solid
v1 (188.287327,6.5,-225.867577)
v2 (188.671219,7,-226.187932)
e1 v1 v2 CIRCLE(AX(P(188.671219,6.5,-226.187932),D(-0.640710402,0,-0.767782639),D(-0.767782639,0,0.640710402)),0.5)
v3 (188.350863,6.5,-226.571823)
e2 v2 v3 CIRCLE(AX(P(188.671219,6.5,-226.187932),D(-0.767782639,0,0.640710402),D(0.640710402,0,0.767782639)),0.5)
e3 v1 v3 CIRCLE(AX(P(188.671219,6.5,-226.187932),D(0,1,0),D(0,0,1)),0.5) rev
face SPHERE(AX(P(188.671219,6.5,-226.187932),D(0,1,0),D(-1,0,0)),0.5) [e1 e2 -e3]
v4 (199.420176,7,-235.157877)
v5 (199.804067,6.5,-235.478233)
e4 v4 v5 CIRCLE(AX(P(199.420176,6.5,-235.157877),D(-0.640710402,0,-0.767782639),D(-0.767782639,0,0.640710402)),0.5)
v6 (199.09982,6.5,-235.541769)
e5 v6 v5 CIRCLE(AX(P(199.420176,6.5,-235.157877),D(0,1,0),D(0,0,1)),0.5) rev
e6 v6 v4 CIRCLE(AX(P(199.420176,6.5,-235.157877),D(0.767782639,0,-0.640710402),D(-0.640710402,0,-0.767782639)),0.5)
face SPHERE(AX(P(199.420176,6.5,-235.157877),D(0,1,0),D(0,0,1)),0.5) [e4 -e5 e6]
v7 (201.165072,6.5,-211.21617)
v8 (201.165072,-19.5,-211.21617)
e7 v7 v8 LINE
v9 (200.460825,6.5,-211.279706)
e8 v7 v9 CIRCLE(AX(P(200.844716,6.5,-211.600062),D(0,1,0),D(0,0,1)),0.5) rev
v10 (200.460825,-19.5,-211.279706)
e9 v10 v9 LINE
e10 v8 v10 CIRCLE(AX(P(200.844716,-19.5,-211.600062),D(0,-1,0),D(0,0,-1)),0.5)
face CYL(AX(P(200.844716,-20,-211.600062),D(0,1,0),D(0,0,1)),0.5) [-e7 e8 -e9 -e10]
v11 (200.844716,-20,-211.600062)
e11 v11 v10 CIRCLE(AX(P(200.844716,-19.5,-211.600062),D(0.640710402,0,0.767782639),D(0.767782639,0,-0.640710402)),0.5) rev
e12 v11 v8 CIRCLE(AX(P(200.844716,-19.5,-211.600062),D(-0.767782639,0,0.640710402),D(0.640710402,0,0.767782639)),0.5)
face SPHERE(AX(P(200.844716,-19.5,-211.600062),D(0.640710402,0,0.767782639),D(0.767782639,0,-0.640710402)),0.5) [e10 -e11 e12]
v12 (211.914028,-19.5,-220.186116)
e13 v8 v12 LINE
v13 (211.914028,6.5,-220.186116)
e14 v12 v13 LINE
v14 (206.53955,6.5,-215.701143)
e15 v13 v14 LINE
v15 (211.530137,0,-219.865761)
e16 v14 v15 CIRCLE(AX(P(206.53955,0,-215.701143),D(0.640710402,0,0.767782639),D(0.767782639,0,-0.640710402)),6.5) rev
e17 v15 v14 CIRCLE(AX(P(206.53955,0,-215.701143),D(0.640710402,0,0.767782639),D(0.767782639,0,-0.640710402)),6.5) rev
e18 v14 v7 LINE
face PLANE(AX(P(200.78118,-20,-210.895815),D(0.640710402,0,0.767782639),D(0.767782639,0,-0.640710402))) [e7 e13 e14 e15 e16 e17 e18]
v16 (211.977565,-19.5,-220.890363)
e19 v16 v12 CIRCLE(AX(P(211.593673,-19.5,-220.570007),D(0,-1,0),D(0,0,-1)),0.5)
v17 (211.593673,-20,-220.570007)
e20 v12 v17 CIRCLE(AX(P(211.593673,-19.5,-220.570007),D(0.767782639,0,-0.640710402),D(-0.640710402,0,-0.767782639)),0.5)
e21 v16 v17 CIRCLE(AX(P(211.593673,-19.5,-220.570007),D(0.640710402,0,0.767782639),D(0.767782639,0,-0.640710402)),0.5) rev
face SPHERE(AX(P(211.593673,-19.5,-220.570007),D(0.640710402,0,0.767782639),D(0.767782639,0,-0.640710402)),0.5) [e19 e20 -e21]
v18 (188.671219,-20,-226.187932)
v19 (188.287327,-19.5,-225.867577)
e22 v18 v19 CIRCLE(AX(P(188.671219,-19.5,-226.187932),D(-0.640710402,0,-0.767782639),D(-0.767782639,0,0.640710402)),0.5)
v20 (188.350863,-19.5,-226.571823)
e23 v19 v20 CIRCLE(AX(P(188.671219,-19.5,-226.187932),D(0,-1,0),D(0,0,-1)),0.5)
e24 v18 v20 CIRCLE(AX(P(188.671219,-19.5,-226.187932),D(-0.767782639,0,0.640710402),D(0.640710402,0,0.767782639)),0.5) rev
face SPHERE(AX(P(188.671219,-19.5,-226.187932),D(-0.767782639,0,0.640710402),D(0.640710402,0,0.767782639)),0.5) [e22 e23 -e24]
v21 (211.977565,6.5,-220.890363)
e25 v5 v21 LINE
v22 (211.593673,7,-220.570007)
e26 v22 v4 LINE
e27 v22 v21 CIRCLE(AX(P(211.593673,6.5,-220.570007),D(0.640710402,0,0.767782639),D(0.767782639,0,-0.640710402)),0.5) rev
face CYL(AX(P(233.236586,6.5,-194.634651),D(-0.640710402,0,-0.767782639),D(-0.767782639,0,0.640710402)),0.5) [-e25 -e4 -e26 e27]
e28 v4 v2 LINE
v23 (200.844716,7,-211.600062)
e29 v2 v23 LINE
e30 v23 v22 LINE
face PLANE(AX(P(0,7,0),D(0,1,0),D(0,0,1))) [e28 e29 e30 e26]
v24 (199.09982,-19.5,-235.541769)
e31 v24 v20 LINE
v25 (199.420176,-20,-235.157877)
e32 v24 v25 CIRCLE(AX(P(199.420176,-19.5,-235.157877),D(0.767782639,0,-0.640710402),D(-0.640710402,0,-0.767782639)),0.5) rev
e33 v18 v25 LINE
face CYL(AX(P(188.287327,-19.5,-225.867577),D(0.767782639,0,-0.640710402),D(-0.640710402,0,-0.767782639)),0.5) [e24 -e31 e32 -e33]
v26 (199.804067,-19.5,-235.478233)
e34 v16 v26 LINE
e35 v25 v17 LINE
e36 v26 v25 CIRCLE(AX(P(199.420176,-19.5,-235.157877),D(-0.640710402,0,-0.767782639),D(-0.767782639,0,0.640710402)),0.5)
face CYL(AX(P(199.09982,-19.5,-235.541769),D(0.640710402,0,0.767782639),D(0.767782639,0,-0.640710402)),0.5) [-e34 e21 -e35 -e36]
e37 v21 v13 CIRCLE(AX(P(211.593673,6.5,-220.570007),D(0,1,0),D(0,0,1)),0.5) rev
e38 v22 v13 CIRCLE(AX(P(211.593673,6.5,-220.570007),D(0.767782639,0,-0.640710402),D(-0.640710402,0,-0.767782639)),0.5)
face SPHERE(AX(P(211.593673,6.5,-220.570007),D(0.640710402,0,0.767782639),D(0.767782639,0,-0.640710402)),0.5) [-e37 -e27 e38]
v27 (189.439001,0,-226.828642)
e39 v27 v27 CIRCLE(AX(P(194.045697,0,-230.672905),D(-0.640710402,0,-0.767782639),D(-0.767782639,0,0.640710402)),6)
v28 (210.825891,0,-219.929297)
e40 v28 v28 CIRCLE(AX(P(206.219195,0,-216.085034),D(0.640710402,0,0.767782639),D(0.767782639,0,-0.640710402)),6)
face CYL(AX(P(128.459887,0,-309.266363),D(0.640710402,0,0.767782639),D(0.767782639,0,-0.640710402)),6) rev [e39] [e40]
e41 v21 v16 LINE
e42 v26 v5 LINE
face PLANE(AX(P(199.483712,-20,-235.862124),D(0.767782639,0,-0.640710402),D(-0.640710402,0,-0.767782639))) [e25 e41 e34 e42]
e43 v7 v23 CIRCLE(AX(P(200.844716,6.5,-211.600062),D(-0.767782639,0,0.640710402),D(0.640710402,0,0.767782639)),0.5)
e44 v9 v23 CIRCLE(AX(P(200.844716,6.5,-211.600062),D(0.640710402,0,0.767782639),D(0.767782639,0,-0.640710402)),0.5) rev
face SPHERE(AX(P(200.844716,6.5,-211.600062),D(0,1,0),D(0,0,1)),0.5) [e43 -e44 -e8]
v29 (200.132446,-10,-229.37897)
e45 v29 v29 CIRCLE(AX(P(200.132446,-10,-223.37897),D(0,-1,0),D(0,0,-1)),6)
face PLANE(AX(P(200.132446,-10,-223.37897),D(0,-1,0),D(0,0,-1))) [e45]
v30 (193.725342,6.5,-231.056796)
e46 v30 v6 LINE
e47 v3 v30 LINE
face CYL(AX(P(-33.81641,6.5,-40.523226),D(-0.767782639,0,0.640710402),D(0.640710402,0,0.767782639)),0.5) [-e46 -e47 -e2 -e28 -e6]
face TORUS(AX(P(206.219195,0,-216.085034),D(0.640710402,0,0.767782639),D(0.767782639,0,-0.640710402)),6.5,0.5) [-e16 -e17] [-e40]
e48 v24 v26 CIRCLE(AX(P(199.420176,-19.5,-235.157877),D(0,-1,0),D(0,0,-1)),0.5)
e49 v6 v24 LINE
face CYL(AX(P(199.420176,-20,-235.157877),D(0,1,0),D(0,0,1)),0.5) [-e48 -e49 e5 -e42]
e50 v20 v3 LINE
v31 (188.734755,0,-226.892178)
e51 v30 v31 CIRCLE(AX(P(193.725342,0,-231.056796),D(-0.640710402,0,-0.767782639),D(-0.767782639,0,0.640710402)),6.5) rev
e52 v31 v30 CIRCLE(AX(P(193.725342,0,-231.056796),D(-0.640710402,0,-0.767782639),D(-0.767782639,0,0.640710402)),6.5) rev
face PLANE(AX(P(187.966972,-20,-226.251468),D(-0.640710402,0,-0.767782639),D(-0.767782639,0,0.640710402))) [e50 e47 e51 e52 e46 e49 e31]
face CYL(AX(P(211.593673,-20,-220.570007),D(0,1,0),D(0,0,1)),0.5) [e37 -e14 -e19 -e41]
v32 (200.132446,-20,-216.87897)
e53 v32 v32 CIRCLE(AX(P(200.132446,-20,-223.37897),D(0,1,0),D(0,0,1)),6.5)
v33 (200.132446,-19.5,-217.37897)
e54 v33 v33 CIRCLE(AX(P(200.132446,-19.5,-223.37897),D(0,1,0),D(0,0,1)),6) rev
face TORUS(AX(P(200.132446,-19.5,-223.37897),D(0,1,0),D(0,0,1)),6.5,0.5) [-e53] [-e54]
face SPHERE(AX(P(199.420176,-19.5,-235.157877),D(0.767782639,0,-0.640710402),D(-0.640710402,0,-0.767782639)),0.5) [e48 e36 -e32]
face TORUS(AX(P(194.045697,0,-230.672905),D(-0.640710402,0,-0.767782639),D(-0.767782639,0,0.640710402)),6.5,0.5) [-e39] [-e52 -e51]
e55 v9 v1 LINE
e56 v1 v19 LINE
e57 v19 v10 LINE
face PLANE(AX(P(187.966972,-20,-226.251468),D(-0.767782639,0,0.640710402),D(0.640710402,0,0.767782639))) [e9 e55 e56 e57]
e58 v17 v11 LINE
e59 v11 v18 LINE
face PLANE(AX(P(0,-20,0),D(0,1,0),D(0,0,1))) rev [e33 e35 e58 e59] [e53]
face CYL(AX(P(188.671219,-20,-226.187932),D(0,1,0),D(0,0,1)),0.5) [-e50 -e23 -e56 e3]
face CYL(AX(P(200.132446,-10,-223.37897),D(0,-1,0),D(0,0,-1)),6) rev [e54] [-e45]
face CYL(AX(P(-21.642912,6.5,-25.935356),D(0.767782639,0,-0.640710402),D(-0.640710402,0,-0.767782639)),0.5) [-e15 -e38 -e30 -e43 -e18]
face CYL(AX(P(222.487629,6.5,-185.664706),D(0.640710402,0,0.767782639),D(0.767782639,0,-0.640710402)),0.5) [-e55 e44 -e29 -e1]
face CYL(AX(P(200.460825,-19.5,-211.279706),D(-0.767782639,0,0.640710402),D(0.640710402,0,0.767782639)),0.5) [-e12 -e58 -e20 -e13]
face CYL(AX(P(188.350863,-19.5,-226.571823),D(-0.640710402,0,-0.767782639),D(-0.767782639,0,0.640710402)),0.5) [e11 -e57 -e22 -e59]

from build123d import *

# Parameters (mm, degrees)
BOSS_EXTRUDE1_DEPTH      = 7
BOSS_EXTRUDE1_DEPTH_BACK = 20
SKETCH28_R               = 6
CUT_EXTRUDE1_DEPTH       = 10
CUT_SWEEP1_PROFILE_R     = 6
FILLET1_R                = 0.5


with BuildPart() as part:
    # Sketch27 → Boss-Extrude1 (new, two sides: drawn at the far end of the back side and taken through both)
    with BuildSketch(Plane(origin=(0, 0, 0), x_dir=(1, 0, 0), z_dir=(0, 1, 0)).offset(-BOSS_EXTRUDE1_DEPTH_BACK)):
        Polygon((187.966972175, 226.25146795), (199.483711764, 235.862123975), (212.297919797, 220.506471189), (200.781180208, 210.895815164), align=None)
    extrude(amount=BOSS_EXTRUDE1_DEPTH + BOSS_EXTRUDE1_DEPTH_BACK)

    # Sketch28 → Cut-Extrude1 (cut)
    with BuildSketch(Plane.XZ.offset(20)):
        with Locations(Location((200.132445986, -223.37896957, 0), (0, 0, 270))):
            Circle(SKETCH28_R)
    extrude(amount=-CUT_EXTRUDE1_DEPTH, mode=Mode.SUBTRACT)

    # Cut-Sweep1: sweep along a path in Sketch19
    with BuildLine(Plane(origin=(0, 0, 0), x_dir=(1, 0, 0), z_dir=(0, 1, 0))) as cut_sweep1_path:
        Line((128.459886798, 309.266363493), (271.805005174, 137.491575647))
    # Cut-Sweep1 profile (on start of the path) → Cut-Sweep1 (sweep, cut)
    with BuildSketch(Plane(origin=(128.459886798, 0, -309.266363493), x_dir=(0.767782639292157, 0, -0.6407104016648784), z_dir=(0.6407104016648784, 0, 0.767782639292157))):
        Circle(CUT_SWEEP1_PROFILE_R)
    sweep(path=cut_sweep1_path.line, mode=Mode.SUBTRACT)

    # Fillet1
    fillet1_edges = [part.edges().sort_by_distance(p)[0] for p in [
        (205.890815781, 7, -228.184297582),
        (194.374076191, -20, -218.573641557),
        (193.725341969, 7, -231.056795963),
        (194.374076191, 7, -218.573641557),
        (206.539550003, 7, -215.701143177),
        (206.539550003, -20, -215.701143177),
        (200.132445986, -20, -217.37896957),
        (201.932854167, 0, -211.856880767),
        (189.118646134, 0, -227.212533553),
        (205.890815781, -20, -228.184297582),
        (212.297919797, -6.5, -220.506471189),
        (200.781180208, -6.5, -210.895815164),
        (187.966972175, -6.5, -226.25146795),
        (199.483711764, -6.5, -235.862123975),
        (193.725341969, -20, -231.056795963),
    ]]
    fillet(fillet1_edges, radius=FILLET1_R - 0.0001)  # a hair under: the kernel refuses the full size


solid = part.part
